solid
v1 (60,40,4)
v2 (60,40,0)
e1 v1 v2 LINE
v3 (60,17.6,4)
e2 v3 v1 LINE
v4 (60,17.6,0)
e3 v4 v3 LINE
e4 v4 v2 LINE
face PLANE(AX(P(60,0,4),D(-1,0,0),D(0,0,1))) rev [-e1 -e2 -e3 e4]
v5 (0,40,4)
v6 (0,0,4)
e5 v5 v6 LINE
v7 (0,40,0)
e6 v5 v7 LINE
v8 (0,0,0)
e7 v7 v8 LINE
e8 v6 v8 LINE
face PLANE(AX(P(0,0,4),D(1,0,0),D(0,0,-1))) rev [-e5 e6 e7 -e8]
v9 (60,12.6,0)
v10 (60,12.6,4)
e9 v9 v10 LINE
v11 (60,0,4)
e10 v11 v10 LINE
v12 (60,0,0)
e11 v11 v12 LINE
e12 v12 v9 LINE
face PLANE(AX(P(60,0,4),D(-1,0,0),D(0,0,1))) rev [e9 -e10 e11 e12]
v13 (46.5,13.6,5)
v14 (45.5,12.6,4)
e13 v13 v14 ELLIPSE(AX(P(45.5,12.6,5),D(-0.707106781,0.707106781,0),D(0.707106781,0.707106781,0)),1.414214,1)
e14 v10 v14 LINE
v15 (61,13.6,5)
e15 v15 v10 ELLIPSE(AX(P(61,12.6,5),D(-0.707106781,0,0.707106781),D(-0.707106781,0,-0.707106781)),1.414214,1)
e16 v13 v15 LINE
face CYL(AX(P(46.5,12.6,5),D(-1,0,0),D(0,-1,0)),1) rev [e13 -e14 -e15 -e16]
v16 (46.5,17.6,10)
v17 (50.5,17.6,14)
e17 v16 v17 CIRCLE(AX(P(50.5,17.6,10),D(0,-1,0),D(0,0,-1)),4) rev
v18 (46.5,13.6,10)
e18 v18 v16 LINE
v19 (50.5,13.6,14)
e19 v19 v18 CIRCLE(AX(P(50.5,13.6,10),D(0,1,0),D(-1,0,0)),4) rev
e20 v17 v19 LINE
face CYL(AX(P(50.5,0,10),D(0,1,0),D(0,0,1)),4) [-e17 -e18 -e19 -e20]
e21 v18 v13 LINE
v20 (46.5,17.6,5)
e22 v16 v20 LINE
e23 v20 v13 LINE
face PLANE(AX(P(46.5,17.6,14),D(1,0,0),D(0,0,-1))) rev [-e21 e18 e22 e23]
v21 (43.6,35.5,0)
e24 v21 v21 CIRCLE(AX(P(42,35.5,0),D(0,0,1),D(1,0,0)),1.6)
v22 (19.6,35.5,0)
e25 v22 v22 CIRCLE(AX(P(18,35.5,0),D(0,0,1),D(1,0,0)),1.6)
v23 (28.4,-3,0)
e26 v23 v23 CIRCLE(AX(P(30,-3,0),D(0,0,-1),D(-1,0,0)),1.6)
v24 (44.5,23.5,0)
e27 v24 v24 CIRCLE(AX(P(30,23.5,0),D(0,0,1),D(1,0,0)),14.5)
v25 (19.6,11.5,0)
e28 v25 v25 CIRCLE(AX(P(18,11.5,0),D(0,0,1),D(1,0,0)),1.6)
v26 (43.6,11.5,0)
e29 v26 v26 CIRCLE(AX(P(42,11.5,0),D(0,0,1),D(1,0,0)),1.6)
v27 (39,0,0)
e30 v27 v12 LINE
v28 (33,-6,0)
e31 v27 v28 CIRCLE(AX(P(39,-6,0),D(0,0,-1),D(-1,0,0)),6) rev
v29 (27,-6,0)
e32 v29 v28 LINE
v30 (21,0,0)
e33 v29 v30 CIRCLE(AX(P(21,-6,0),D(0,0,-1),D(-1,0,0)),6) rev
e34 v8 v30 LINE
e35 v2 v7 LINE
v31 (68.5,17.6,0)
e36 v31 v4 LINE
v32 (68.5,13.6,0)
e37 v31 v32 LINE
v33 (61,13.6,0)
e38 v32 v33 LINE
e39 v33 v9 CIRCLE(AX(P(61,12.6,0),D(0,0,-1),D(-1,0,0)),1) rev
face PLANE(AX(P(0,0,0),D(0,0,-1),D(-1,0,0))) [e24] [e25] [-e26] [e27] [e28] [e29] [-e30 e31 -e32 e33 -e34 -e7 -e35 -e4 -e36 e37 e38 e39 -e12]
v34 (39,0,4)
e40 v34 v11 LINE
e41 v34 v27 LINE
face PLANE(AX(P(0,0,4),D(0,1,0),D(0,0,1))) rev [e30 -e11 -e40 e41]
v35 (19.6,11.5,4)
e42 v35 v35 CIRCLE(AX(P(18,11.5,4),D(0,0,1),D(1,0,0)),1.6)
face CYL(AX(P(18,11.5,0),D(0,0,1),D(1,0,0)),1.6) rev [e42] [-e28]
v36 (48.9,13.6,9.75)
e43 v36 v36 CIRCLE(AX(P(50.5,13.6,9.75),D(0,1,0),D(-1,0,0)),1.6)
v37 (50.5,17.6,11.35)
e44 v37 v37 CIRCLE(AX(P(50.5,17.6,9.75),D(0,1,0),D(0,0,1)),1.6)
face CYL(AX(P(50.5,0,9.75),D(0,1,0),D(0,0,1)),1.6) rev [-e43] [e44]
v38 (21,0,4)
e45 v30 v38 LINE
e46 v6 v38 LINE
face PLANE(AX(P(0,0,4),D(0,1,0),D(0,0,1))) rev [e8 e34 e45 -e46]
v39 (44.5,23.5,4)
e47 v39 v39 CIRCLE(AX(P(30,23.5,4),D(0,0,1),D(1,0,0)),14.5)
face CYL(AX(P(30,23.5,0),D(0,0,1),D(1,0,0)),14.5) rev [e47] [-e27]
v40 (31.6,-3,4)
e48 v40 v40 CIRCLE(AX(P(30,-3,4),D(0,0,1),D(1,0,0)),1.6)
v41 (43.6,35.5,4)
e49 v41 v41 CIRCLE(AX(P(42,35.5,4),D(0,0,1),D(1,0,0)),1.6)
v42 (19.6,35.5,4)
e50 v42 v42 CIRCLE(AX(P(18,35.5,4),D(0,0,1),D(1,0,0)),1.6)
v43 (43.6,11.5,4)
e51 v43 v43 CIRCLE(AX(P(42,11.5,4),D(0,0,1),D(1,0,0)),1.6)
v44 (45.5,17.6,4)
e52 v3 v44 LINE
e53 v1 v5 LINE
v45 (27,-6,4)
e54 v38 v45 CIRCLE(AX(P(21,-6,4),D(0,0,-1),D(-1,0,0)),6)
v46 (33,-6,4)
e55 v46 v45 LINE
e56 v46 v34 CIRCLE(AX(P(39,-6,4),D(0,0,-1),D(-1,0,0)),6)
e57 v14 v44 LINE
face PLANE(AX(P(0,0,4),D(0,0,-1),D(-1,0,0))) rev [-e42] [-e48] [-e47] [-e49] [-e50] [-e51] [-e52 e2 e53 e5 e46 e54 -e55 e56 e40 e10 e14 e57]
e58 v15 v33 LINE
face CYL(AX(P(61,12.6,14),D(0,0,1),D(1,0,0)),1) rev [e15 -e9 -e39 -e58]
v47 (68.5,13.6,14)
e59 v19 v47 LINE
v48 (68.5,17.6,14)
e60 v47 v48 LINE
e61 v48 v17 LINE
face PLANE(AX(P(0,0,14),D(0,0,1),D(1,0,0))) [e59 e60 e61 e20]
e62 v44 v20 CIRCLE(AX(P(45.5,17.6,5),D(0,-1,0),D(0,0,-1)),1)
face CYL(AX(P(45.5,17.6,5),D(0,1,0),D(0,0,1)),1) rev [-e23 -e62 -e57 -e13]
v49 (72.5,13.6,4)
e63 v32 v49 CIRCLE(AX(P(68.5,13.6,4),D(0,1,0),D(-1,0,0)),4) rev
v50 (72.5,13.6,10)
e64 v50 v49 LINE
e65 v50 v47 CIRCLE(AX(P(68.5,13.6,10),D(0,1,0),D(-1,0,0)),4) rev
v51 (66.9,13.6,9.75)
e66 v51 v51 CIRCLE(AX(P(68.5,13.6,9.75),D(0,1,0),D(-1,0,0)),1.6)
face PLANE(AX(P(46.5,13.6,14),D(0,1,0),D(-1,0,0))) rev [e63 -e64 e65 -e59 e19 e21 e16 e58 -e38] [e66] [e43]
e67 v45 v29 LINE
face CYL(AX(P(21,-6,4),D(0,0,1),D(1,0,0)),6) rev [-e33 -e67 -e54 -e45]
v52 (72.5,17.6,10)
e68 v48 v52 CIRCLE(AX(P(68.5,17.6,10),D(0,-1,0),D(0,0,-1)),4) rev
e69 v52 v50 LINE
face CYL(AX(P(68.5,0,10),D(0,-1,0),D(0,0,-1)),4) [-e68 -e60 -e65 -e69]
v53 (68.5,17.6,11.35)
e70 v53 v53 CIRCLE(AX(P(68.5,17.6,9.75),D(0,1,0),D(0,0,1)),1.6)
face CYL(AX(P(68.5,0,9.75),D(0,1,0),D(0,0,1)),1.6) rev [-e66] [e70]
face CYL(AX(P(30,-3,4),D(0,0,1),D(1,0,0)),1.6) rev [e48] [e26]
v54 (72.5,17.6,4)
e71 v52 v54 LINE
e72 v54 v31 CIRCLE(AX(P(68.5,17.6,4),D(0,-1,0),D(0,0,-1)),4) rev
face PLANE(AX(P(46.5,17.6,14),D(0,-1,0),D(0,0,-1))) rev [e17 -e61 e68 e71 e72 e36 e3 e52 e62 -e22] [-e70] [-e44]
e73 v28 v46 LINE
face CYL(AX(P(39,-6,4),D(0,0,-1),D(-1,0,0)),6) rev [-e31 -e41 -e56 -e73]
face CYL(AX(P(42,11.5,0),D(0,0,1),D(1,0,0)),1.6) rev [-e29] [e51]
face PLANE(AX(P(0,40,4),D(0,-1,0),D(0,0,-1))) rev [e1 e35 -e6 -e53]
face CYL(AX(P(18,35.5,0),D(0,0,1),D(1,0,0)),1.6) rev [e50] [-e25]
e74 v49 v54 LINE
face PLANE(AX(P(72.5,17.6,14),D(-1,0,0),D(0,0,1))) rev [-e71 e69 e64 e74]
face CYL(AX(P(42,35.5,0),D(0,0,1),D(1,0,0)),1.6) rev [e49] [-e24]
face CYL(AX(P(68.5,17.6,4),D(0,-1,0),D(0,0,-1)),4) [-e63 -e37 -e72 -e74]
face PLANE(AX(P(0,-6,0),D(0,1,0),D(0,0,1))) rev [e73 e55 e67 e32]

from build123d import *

# Parameters (mm, degrees)
SKETCH1_W                  = 60
SKETCH1_H                  = 40
BOSS_EXTRUDE1_DEPTH        = 4
SKETCH4_R                  = 14.5
CUT_EXTRUDE1_DEPTH         = 4
SKETCH6_R                  = 1.6
CUT_EXTRUDE2_DEPTH         = 4
SKETCH7_W                  = 26
SKETCH7_H                  = 4
BOSS_EXTRUDE3_DEPTH        = 10
SKETCH8_R                  = 1.6
CUT_EXTRUDE3_DEPTH         = 78.162231694
SKETCH9_W                  = 4
SKETCH9_H                  = 4
BOSS_EXTRUDE4_DEPTH        = 12.5
FILLET2_R                  = 4
FILLET3_R                  = 1
SKETCH10_W                 = 6
SKETCH10_H                 = 4
BOSS_EXTRUDE5_DEPTH        = 6
FILLET4_R                  = 6
F_3_2_3_2_DIAMETER_HOLE1_D = 3.2


with BuildPart() as part:
    # Sketch1 → Boss-Extrude1 (new body)
    with BuildSketch(Plane.XY):
        with Locations((30, 20)):
            Rectangle(SKETCH1_W, SKETCH1_H)
    extrude(amount=BOSS_EXTRUDE1_DEPTH)

    # Sketch4 → Cut-Extrude1 (cut)
    with BuildSketch(Plane.XY.offset(4)):
        with Locations((30, 23.5)):
            Circle(SKETCH4_R)
    extrude(amount=-CUT_EXTRUDE1_DEPTH, mode=Mode.SUBTRACT)

    # Sketch6 → Cut-Extrude2 (cut)
    with BuildSketch(Plane.XY.offset(4)):
        with Locations((42, 11.5)):
            Circle(SKETCH6_R)
        with Locations((18, 11.5)):
            Circle(SKETCH6_R)
        with Locations((18, 35.5)):
            Circle(SKETCH6_R)
        with Locations((42, 35.5)):
            Circle(SKETCH6_R)
    extrude(amount=-CUT_EXTRUDE2_DEPTH, mode=Mode.SUBTRACT)

    # Sketch7 → Boss-Extrude3 (add)
    with BuildSketch(Plane.XY.offset(4)):
        with Locations((59.5, 15.6)):
            Rectangle(SKETCH7_W, SKETCH7_H)
    extrude(amount=BOSS_EXTRUDE3_DEPTH)

    # Sketch8 → Cut-Extrude3 (cut, through all)
    with BuildSketch(Plane(origin=(0, 17.6, 0), x_dir=(1, 0, 0), z_dir=(0, 1, 0))):
        with Locations(Location((68.5, -9.75, 0), (0, 0, 270))):
            Circle(SKETCH8_R)
        with Locations(Location((50.5, -9.75, 0), (0, 0, 270))):
            Circle(SKETCH8_R)
    extrude(amount=-CUT_EXTRUDE3_DEPTH, mode=Mode.SUBTRACT)

    # Sketch9 → Boss-Extrude4 (add)
    with BuildSketch(Plane(origin=(60, 0, 0), x_dir=(0, 0, -1), z_dir=(1, 0, 0))):
        with Locations((-2, 15.6)):
            Rectangle(SKETCH9_W, SKETCH9_H)
    extrude(amount=BOSS_EXTRUDE4_DEPTH)

    # Fillet2
    fillet2_edges = [part.edges().sort_by_distance(p)[0] for p in [
        (46.5, 15.6, 14),
        (72.5, 15.6, 14),
        (72.5, 15.6, 0),
    ]]
    fillet(fillet2_edges, radius=FILLET2_R)

    # Fillet3
    fillet3_edges = [part.edges().sort_by_distance(p)[0] for p in [
        (46.5, 15.6, 4),
        (53.25, 13.6, 4),
        (60, 13.6, 2),
    ]]
    fillet(fillet3_edges, radius=FILLET3_R)

    # Sketch10 → Boss-Extrude5 (add)
    with BuildSketch(Plane.XZ):
        with Locations((30, 2)):
            Rectangle(SKETCH10_W, SKETCH10_H)
    extrude(amount=BOSS_EXTRUDE5_DEPTH)

    # Fillet4
    fillet4_edges = [part.edges().sort_by_distance(p)[0] for p in [
        (27, 0, 2),
        (33, 0, 2),
    ]]
    fillet(fillet4_edges, radius=FILLET4_R - 0.0001)  # a hair under: the kernel refuses the full size

    # Ø3.2 (3.2) Diameter Hole1 (through all)
    with Locations(Plane.XY.offset(4)):
        with Locations((30, -3)):
            Hole(F_3_2_3_2_DIAMETER_HOLE1_D / 2)


solid = part.part
